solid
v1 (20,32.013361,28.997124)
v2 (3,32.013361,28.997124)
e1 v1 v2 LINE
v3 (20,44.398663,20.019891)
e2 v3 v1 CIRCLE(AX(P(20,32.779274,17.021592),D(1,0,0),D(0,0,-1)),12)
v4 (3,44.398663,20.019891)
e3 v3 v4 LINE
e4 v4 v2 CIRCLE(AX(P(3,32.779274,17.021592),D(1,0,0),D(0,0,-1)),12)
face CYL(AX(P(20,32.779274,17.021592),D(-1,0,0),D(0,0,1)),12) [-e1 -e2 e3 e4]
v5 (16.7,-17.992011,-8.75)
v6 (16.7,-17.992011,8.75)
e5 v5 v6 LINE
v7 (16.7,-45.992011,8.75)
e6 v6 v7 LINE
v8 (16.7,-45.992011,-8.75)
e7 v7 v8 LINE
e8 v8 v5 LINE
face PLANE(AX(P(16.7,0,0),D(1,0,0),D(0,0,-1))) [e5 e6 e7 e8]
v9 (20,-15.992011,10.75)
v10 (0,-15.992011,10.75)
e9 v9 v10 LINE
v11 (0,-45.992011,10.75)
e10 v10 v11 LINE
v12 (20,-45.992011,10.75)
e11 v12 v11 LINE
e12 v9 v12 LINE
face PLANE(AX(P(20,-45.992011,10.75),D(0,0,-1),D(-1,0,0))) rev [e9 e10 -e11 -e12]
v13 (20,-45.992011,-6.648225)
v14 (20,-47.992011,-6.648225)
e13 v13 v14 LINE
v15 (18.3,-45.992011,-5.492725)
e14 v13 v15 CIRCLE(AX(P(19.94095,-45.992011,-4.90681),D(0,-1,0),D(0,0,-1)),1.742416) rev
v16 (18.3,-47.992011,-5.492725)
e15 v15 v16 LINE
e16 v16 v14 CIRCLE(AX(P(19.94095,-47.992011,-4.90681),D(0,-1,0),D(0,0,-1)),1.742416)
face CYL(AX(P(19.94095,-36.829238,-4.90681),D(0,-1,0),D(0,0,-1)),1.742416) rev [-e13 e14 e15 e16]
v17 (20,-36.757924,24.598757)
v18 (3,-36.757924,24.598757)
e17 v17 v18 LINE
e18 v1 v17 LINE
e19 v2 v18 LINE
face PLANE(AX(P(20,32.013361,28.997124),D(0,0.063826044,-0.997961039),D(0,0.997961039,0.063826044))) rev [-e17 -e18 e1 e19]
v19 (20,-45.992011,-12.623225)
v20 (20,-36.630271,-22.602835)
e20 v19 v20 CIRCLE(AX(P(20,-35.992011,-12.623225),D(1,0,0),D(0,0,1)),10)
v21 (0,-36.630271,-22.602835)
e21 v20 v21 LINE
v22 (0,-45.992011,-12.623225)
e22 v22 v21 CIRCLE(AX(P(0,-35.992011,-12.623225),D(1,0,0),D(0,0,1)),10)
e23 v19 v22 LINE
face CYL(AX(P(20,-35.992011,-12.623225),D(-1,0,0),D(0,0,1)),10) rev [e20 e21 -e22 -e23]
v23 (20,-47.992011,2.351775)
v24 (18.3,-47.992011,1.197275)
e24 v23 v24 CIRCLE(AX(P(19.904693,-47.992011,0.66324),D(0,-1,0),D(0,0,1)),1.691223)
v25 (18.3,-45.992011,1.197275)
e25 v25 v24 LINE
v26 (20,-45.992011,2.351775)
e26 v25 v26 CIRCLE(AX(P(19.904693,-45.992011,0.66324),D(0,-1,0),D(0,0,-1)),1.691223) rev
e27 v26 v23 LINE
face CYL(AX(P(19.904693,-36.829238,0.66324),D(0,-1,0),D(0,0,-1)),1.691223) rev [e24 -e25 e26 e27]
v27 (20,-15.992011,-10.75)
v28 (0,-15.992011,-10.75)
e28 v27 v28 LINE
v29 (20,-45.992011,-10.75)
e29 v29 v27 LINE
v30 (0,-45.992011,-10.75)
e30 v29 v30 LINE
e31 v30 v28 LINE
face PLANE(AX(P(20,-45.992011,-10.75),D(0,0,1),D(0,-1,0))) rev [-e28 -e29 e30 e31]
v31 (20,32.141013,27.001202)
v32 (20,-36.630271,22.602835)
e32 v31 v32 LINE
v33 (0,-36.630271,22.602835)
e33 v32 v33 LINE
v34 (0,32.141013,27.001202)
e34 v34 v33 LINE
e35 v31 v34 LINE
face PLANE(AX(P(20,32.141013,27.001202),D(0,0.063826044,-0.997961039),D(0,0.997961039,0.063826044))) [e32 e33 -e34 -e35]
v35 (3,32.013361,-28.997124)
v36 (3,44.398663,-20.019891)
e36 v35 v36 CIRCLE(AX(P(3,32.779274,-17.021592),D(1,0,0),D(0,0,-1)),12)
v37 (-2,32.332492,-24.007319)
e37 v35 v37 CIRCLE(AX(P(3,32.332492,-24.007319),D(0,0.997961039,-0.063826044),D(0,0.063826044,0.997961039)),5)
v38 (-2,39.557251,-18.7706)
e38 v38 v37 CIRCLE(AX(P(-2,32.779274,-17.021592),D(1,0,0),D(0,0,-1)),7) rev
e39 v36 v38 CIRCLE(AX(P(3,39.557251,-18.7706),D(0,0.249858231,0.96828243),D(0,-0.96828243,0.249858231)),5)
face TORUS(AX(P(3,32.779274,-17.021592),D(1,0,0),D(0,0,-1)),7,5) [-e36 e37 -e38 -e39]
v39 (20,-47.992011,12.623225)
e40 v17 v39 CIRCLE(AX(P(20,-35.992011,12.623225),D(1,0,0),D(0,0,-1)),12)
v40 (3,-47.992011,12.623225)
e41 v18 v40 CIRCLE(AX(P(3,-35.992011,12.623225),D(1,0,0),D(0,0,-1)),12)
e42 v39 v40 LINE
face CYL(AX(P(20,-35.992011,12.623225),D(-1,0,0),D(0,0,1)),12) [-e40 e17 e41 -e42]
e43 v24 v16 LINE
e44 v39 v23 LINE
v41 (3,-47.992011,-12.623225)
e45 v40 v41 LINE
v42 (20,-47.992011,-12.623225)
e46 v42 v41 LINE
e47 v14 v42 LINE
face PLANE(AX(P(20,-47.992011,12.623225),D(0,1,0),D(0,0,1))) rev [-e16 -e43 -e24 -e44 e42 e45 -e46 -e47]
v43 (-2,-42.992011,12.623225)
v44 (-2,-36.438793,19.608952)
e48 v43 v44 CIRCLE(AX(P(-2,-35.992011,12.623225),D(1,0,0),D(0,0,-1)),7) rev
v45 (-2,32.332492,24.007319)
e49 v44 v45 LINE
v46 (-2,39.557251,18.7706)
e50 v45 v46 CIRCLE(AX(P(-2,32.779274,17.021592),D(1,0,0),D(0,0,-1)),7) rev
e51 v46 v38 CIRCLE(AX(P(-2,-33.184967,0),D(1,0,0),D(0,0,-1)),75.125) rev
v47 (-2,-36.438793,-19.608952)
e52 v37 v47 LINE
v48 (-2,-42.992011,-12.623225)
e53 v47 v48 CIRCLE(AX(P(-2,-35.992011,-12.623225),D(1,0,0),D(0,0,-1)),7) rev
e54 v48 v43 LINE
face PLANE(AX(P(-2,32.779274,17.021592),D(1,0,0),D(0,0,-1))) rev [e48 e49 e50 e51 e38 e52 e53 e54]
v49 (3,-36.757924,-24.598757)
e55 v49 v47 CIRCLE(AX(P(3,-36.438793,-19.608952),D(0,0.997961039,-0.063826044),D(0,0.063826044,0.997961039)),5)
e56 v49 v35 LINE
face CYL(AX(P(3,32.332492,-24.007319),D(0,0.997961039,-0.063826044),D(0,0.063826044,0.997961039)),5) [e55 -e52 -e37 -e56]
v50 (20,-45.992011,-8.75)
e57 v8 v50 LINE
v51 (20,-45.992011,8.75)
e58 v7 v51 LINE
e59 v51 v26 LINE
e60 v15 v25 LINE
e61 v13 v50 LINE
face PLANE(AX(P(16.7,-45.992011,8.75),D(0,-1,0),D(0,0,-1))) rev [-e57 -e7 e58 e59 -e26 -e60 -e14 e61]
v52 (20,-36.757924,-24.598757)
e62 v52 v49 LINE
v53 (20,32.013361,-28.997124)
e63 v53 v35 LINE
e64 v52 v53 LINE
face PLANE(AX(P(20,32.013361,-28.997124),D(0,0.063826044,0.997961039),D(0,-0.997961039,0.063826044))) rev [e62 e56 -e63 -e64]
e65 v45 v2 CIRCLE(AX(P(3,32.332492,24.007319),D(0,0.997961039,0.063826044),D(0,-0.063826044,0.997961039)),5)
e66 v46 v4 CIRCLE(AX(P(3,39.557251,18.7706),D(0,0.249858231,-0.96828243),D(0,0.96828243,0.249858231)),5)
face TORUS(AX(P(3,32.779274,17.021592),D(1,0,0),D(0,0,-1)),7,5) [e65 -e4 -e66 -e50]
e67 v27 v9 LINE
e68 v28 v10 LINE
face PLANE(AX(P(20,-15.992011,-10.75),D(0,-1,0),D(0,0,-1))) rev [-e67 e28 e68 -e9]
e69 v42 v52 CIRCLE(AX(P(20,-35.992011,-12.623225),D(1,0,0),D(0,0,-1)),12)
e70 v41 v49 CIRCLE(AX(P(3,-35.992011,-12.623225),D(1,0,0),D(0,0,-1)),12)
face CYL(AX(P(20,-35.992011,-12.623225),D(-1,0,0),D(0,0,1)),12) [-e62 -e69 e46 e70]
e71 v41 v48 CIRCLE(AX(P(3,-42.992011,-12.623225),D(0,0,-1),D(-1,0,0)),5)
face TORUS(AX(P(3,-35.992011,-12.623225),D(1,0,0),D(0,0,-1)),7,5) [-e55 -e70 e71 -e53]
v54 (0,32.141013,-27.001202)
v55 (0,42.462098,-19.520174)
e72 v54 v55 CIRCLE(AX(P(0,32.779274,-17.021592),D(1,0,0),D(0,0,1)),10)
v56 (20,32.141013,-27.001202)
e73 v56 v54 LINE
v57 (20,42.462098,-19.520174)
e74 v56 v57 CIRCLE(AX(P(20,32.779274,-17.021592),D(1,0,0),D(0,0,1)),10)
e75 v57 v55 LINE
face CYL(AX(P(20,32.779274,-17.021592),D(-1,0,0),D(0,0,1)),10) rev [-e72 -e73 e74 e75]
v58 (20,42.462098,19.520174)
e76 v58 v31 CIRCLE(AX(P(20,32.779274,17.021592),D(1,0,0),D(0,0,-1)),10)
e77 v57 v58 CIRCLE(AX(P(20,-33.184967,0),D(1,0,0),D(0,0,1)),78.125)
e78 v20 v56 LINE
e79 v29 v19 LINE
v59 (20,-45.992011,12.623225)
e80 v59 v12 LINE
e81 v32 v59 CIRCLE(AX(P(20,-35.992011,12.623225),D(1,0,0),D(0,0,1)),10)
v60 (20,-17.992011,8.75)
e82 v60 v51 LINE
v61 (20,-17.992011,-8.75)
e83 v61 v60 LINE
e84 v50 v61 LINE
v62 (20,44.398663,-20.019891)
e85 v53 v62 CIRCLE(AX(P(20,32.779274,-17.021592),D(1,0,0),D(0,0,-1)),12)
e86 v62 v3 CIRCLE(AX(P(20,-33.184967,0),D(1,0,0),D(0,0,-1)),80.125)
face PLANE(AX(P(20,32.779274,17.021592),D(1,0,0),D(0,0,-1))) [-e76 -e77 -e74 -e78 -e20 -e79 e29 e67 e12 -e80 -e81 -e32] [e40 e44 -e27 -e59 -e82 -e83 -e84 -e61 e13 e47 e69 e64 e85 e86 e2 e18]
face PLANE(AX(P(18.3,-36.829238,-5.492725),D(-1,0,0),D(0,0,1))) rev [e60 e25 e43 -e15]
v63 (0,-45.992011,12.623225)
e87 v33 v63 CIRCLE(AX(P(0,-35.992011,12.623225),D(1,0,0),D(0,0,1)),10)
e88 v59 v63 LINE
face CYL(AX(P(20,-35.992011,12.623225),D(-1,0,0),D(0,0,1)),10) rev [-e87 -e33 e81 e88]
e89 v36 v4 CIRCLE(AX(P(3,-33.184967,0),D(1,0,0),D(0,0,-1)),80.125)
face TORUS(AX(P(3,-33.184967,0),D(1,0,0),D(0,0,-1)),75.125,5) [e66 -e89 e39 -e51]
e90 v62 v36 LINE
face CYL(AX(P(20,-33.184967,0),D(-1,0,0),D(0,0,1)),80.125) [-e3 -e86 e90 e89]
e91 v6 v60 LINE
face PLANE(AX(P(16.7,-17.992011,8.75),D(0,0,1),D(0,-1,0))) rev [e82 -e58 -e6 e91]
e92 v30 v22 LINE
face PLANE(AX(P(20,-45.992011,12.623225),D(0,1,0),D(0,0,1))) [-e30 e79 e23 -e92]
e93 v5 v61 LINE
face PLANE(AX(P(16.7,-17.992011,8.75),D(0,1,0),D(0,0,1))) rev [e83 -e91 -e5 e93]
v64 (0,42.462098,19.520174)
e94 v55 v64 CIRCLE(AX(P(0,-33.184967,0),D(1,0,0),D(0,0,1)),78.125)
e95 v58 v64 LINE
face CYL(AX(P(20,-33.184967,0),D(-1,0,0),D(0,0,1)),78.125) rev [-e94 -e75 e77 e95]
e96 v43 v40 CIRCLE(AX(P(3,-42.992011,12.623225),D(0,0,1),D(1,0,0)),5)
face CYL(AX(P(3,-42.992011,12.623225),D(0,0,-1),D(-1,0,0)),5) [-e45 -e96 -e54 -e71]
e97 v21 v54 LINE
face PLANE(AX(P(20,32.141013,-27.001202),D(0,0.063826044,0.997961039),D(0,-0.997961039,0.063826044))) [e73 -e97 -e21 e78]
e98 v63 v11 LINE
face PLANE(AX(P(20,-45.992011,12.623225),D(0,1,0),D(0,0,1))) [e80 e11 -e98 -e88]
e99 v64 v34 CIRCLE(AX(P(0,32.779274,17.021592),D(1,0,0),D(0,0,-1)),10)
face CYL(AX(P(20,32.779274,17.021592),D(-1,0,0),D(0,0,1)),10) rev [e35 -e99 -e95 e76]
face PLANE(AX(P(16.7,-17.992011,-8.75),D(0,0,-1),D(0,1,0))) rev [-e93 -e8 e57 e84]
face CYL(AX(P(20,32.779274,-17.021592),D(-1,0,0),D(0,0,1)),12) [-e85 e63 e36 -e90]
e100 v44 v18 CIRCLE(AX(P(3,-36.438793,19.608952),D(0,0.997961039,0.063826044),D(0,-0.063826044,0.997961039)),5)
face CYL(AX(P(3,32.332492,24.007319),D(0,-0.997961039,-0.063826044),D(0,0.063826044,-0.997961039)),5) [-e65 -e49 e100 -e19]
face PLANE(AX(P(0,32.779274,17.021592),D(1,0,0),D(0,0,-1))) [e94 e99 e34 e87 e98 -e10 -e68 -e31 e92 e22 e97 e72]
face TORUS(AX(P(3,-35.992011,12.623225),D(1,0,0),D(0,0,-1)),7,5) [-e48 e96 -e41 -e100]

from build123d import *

# Parameters (mm, degrees)
BOSS_EXTRUDE1_DEPTH = 20
SHELL4_T            = 2
FILLET2_R           = 5
SKETCH3_W           = 21.5
SKETCH3_H           = 30
BOSS_EXTRUDE2_DEPTH = 20
SKETCH4_W           = 17.5
SKETCH4_H           = 28
CUT_EXTRUDE1_DEPTH  = 3.3
CUT_EXTRUDE2_DEPTH  = 2


with BuildPart() as part:
    # Sketch2 → Boss-Extrude1 (new body)
    with BuildSketch(Plane(origin=(0, 0, 0), x_dir=(0, 0, -1), z_dir=(1, 0, 0))):
        with BuildLine():
            Line((-27.001202387, 32.141013477), (-22.602835252, -36.63027149))
            ThreePointArc((-22.602835252, -36.63027149), (-19.464913087, -43.285247796), (-12.623224858, -45.992011054))
            Line((-12.623224858, -45.992011054), (12.623224858, -45.992011054))
            ThreePointArc((12.623224858, -45.992011054), (19.464913087, -43.285247796), (22.602835252, -36.63027149))
            Line((22.602835252, -36.63027149), (27.001202387, 32.141013477))
            ThreePointArc((27.001202387, 32.141013477), (25.118351891, 38.648045435), (19.520174304, 42.462098214))
            ThreePointArc((19.520174304, 42.462098214), (0, 44.940033366), (-19.520174304, 42.462098214))
            ThreePointArc((-19.520174304, 42.462098214), (-25.118351891, 38.648045435), (-27.001202387, 32.141013477))
        make_face()
    extrude(amount=BOSS_EXTRUDE1_DEPTH)

    # Shell4
    shell4_openings = [part.faces().sort_by_distance(p)[0] for p in [
        (20, 0.52350314, 0),
    ]]
    offset(amount=SHELL4_T, openings=shell4_openings, kind=Kind.INTERSECTION)

    # Fillet2
    # the kernel refuses this fillet: 5 mm, written as the material it takes off along each edge
    with BuildSketch(Plane(origin=(-2, -47.992011054, 12.623224858), x_dir=(1, 0, 0), z_dir=(0, 0, -1))) as fillet2_piece_1:
        with BuildLine():
            CenterArc((FILLET2_R, -FILLET2_R), FILLET2_R, 90, 90)
            Line((0, -FILLET2_R), (0, 0))
            Line((0, 0), (FILLET2_R, 0))
        make_face()
    extrude(amount=25.246449717, mode=Mode.SUBTRACT)
    with BuildSketch(Plane(origin=(-2, -35.992011054, 12.623224858), x_dir=(0, -1, 0), z_dir=(0, 0, -1))) as fillet2_piece_2:
        with BuildLine():
            CenterArc((12 - FILLET2_R, -FILLET2_R), FILLET2_R, 0, 90)
            Line((12 - FILLET2_R, 0), (12, 0))
            Line((12, 0), (12, -FILLET2_R))
        make_face()
    revolve(axis=Axis((-2, -35.992011054, 12.623224858), (-1, 0, 0)), revolution_arc=86.340549578, mode=Mode.SUBTRACT)
    with BuildSketch(Plane(origin=(-2, 32.01336139, 28.997124466), x_dir=(1, 0, 0), z_dir=(0, -0.997961039394411, -0.06382604367205215)), Plane(origin=(-2, -36.757923578, -24.598757331), x_dir=(1, 0, 0), z_dir=(0, 0.9979610393944109, -0.06382604367205376))) as fillet2_piece_3:
        with BuildLine():
            CenterArc((FILLET2_R, -FILLET2_R), FILLET2_R, 90, 90)
            Line((0, -FILLET2_R), (0, 0))
            Line((0, 0), (FILLET2_R, 0))
        make_face()
    extrude(amount=68.911793399, mode=Mode.SUBTRACT)
    with BuildSketch(Plane(origin=(-2, 32.779273914, 17.021591993), x_dir=(0, -0.06382604367205197, 0.997961039394411), z_dir=(0, -0.997961039394411, -0.06382604367205197))) as fillet2_piece_4:
        with BuildLine():
            CenterArc((12 - FILLET2_R, -FILLET2_R), FILLET2_R, 0, 90)
            Line((12 - FILLET2_R, 0), (12, 0))
            Line((12, 0), (12, -FILLET2_R))
        make_face()
    revolve(axis=Axis((-2, 32.779273914, 17.021591993), (-1, 0, 0)), revolution_arc=79.190327228, mode=Mode.SUBTRACT)
    with BuildSketch(Plane(origin=(-2, -33.184966634, 0), x_dir=(0, 0.9682824300555203, 0.249858231094708), z_dir=(0, -0.249858231094708, 0.9682824300555203))) as fillet2_piece_5:
        with BuildLine():
            CenterArc((80.125 - FILLET2_R, -FILLET2_R), FILLET2_R, 0, 90)
            Line((80.125 - FILLET2_R, 0), (80.125, 0))
            Line((80.125, 0), (80.125, -FILLET2_R))
        make_face()
    revolve(axis=Axis((-2, -33.184966634, 0), (-1, 0, 0)), revolution_arc=28.938246388, mode=Mode.SUBTRACT)
    with BuildSketch(Plane(origin=(-2, 32.779273914, -17.021591993), x_dir=(0, 0.9682824300555204, -0.24985823109470737), z_dir=(0, 0.24985823109470737, 0.9682824300555204))) as fillet2_piece_6:
        with BuildLine():
            CenterArc((12 - FILLET2_R, -FILLET2_R), FILLET2_R, 0, 90)
            Line((12 - FILLET2_R, 0), (12, 0))
            Line((12, 0), (12, -FILLET2_R))
        make_face()
    revolve(axis=Axis((-2, 32.779273914, -17.021591993), (-1, 0, 0)), revolution_arc=79.190327228, mode=Mode.SUBTRACT)
    with BuildSketch(Plane(origin=(-2, -35.992011054, -12.623224858), x_dir=(0, -0.06382604367205372, -0.9979610393944109), z_dir=(0, 0.9979610393944109, -0.06382604367205372))) as fillet2_piece_7:
        with BuildLine():
            CenterArc((12 - FILLET2_R, -FILLET2_R), FILLET2_R, 0, 90)
            Line((12 - FILLET2_R, 0), (12, 0))
            Line((12, 0), (12, -FILLET2_R))
        make_face()
    revolve(axis=Axis((-2, -35.992011054, -12.623224858), (-1, 0, 0)), revolution_arc=86.340549578, mode=Mode.SUBTRACT)

    # Sketch3 → Boss-Extrude2 (add)
    with BuildSketch(Plane(origin=(0, 0, 0), x_dir=(0, 0, -1), z_dir=(1, 0, 0))):
        with Locations((0, -30.992011054)):
            Rectangle(SKETCH3_W, SKETCH3_H)
    extrude(amount=BOSS_EXTRUDE2_DEPTH)

    # Sketch4 → Cut-Extrude1 (cut)
    with BuildSketch(Plane(origin=(20, 0, 0), x_dir=(0, 0, -1), z_dir=(1, 0, 0))):
        with Locations((0, -31.992011054)):
            Rectangle(SKETCH4_W, SKETCH4_H)
    extrude(amount=-CUT_EXTRUDE1_DEPTH, mode=Mode.SUBTRACT)

    # Sketch5 → Cut-Extrude2 (cut)
    with BuildSketch(Plane.XZ.offset(47.992011054)):
        with BuildLine():
            Line((20, 2.351775142), (20, -6.648224858))
            ThreePointArc((20, -6.648224858), (18.961461825, -6.347856856), (18.3, -5.492724858))
            Line((18.3, -5.492724858), (18.3, 1.197275142))
            ThreePointArc((18.3, 1.197275142), (18.954546218, 2.062330624), (20, 2.351775142))
        make_face()
    extrude(amount=-CUT_EXTRUDE2_DEPTH, mode=Mode.SUBTRACT)


solid = part.part
